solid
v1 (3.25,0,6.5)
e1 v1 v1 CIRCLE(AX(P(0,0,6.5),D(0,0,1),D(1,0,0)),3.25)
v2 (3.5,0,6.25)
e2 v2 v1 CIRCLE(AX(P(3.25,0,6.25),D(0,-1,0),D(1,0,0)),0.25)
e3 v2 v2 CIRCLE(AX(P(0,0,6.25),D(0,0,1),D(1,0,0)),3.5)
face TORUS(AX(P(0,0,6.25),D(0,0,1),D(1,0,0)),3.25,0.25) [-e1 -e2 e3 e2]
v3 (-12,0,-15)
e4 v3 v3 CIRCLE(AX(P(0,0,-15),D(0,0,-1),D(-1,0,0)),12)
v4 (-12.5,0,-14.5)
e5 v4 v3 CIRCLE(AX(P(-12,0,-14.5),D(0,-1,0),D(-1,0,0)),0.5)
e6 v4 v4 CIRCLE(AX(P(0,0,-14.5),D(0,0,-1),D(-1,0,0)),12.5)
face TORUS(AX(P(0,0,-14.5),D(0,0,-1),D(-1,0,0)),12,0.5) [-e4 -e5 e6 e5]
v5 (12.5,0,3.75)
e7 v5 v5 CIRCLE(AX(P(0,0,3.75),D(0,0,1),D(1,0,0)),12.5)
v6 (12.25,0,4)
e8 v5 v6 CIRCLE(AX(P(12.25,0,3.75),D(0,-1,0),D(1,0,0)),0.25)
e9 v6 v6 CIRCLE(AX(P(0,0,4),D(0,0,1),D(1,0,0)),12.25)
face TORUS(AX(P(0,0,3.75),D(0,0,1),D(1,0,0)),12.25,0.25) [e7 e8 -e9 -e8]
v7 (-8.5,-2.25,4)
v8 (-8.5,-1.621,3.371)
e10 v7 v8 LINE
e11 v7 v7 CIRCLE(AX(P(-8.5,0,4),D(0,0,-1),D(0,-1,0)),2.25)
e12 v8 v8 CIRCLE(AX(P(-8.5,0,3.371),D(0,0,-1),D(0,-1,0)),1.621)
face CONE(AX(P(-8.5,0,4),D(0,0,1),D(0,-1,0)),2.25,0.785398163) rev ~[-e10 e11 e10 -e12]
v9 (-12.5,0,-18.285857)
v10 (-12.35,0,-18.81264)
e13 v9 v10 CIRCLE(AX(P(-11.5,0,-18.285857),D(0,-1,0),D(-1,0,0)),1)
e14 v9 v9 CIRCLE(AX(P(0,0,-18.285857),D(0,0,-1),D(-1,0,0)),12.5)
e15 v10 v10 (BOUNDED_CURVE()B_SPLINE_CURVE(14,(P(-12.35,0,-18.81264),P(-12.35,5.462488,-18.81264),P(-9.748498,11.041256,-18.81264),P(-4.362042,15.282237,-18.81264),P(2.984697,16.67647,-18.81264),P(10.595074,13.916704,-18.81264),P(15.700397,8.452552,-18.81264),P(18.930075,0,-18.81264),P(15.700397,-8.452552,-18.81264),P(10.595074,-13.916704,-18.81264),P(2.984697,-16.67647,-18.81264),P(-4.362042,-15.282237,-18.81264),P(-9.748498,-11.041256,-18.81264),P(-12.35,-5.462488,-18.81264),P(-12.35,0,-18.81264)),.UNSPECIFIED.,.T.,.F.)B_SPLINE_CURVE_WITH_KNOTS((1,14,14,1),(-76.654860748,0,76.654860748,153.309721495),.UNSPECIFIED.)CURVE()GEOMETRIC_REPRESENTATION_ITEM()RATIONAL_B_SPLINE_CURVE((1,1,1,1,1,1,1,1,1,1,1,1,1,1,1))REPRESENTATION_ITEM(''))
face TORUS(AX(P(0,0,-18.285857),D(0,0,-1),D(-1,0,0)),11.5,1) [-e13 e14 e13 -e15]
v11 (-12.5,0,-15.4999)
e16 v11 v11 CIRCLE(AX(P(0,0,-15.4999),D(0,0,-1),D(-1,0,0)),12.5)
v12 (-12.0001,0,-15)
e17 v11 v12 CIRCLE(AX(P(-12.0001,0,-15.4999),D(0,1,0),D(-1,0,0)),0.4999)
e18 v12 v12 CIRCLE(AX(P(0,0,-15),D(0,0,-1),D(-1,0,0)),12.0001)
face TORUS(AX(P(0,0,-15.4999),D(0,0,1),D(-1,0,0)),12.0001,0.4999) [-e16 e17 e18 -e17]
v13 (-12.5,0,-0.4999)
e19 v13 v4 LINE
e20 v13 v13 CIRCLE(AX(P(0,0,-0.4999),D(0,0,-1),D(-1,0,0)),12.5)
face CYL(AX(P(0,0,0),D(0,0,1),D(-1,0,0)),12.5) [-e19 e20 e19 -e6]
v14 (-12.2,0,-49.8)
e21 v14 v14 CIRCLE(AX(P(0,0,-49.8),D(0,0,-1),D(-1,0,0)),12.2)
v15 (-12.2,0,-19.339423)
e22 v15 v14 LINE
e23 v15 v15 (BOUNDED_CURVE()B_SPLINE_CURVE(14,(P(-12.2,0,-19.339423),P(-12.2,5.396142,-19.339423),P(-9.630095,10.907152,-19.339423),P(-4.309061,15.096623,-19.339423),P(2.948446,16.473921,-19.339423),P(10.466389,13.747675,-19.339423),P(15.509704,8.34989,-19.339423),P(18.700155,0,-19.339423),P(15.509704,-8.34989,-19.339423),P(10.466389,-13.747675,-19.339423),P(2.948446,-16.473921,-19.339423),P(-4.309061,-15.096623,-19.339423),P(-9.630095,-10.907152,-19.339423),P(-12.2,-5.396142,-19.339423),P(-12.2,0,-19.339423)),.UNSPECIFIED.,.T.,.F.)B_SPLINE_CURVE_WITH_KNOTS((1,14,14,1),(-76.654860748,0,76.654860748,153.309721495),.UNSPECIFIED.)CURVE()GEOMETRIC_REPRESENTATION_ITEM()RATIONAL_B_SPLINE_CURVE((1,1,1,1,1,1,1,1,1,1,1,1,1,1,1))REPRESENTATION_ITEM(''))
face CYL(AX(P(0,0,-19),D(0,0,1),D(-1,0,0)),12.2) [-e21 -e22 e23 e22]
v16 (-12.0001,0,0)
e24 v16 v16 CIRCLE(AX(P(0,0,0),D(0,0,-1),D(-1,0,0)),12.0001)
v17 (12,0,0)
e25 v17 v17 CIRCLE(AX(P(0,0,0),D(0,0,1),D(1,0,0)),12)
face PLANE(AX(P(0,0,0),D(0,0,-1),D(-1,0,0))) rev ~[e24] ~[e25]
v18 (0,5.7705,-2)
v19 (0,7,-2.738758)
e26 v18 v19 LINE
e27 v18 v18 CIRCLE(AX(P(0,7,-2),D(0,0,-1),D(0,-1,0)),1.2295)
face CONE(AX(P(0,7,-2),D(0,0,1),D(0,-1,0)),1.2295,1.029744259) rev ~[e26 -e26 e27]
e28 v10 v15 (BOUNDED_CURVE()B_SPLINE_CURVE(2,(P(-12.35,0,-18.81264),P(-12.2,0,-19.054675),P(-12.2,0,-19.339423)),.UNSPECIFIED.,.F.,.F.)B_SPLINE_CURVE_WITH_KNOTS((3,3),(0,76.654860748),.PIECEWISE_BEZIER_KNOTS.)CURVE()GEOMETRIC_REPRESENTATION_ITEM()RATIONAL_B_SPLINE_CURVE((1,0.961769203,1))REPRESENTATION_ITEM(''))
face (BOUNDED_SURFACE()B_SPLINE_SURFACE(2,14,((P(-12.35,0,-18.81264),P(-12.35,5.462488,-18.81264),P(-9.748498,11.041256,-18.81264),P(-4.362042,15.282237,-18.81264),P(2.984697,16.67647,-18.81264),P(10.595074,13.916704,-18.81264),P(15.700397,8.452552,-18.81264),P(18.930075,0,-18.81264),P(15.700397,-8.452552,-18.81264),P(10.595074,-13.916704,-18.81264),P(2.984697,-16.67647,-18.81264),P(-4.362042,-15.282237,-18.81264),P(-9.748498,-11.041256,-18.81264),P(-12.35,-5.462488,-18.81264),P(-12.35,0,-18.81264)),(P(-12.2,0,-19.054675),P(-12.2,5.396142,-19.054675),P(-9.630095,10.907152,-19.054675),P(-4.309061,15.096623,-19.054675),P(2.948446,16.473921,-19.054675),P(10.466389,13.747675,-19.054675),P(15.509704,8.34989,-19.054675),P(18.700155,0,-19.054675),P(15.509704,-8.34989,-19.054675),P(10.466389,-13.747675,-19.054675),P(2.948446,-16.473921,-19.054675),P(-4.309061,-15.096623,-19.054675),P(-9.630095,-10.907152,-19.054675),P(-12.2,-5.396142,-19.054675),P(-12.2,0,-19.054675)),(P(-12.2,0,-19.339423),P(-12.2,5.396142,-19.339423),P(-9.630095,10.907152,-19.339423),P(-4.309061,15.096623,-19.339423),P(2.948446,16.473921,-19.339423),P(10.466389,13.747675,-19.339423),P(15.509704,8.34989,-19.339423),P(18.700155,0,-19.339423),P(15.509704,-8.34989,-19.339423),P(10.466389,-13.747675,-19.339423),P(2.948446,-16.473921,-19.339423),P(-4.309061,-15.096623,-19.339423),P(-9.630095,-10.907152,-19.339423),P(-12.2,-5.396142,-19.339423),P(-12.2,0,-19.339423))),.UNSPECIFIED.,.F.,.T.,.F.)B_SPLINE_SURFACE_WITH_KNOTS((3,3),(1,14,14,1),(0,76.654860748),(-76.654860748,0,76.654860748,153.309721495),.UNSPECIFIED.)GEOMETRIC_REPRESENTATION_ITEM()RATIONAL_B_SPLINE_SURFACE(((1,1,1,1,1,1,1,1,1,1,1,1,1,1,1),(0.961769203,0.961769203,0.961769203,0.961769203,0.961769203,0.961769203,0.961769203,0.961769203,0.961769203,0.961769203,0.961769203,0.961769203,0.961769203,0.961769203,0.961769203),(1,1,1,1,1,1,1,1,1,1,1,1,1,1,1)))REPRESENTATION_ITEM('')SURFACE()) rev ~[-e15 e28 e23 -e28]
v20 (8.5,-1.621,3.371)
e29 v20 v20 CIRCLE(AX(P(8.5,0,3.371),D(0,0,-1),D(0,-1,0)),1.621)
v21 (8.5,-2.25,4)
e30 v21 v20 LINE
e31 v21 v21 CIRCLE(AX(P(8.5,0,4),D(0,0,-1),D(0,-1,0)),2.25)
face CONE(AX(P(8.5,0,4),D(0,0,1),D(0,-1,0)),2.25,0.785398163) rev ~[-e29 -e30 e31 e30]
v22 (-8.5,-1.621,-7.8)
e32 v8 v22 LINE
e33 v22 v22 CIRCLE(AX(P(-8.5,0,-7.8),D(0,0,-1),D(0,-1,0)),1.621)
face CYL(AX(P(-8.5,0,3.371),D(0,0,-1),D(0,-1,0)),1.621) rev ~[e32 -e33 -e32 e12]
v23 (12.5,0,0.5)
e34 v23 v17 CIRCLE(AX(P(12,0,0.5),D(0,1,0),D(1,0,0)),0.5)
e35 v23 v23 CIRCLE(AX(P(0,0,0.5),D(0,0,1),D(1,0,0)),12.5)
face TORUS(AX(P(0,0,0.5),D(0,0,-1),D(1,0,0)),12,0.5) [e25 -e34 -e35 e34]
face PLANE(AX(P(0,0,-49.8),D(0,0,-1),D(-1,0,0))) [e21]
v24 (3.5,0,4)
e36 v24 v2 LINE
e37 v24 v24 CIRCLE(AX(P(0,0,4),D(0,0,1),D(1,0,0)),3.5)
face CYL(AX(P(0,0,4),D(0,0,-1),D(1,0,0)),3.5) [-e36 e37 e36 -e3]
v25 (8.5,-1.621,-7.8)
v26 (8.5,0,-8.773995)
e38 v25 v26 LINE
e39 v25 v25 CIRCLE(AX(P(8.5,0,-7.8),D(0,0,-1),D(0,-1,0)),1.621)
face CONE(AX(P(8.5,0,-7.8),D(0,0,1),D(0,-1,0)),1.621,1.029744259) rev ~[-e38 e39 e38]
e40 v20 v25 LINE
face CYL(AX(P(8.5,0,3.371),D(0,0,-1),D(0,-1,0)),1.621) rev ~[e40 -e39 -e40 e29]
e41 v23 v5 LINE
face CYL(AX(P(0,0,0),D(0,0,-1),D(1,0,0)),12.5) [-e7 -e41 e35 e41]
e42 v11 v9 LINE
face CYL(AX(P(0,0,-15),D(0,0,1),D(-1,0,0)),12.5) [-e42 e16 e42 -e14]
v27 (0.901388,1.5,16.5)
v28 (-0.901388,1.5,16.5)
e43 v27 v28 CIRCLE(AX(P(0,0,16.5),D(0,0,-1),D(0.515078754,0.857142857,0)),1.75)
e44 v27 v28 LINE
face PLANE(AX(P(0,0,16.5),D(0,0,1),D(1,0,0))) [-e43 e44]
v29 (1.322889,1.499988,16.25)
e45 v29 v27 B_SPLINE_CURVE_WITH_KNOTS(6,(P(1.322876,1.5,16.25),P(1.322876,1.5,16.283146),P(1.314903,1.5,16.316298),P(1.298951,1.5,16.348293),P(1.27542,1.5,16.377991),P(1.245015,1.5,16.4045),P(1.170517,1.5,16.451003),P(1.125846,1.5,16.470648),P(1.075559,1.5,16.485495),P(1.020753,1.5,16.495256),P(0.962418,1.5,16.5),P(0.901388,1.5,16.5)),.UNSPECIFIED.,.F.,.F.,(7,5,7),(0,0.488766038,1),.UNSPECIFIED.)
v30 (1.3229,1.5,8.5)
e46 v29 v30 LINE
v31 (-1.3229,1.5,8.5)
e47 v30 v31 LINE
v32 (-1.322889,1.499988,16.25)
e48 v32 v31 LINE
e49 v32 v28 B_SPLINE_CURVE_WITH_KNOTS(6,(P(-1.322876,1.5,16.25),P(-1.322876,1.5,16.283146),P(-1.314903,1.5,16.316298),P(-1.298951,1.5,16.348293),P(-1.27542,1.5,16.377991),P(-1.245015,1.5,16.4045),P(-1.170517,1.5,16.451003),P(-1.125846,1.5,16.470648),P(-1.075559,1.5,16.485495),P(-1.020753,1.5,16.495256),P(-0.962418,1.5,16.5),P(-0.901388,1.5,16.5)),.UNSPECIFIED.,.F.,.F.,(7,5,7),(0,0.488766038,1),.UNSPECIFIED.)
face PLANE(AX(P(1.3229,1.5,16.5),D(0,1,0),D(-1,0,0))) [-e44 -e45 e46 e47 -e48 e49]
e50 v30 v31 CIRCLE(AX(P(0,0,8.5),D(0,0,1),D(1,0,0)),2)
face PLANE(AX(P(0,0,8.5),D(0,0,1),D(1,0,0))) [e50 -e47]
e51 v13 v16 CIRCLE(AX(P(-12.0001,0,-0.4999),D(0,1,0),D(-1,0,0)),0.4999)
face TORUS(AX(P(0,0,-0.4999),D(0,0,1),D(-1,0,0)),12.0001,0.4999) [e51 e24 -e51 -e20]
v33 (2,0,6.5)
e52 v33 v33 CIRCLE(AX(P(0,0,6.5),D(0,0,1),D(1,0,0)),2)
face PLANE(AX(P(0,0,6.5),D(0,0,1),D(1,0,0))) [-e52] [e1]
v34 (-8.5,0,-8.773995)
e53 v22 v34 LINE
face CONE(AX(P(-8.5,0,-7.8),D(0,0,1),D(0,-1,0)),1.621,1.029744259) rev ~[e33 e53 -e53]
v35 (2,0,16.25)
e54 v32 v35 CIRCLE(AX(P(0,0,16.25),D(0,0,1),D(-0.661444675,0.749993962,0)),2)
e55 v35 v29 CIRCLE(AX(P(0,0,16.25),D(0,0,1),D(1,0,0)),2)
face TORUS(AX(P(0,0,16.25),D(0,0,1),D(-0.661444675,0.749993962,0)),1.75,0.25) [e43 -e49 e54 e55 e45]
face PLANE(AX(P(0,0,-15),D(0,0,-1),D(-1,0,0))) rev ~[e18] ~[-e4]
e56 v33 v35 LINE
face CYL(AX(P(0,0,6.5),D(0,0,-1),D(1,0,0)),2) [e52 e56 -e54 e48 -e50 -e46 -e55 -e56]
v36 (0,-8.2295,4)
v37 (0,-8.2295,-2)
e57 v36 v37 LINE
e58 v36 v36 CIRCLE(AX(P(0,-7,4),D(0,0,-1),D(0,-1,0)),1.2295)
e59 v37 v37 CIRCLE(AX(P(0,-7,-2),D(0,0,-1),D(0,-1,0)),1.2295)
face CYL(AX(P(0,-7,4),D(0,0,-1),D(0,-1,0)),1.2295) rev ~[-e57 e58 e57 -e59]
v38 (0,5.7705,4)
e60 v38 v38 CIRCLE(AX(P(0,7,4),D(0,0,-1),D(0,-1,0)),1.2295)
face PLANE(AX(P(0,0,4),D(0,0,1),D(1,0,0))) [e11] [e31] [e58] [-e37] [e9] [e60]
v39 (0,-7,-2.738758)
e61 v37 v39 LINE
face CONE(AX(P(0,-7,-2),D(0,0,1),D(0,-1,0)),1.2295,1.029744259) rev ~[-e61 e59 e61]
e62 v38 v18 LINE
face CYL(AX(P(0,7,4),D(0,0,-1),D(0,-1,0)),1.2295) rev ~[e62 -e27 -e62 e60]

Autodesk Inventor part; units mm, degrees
ref_plane "YZ Plane" through (0, 0, 0) normal (1, 0, 0) x (0, 1, 0)
ref_plane "XZ Plane" through (0, 0, 0) normal (0, 1, 0) x (-1, 0, 0)
ref_plane "XY Plane" through (0, 0, 0) normal (0, 0, 1) x (1, 0, 0)
sketch "Szkic1" plane through (0, 0, 0) normal (0, 0, 1) x (1, 0, 0)
  circle A0 centre (0, 0) radius 12.5
  dimension "d0" = 25
extrude "Wyciągnięcie proste1" add sketch "Szkic1" along normal blind 4
sketch "Szkic2" plane through (0, 0, 0) normal (0, 0, -1) x (-1, 0, 0)
  circle A0 centre (0, 0) radius 12.5 projected
fillet "Zaokrąglenie1" radius 0.5 1 edges at (-12.5, 0, 0)
extrude "Wyciągnięcie proste2" add sketch "Szkic2" along normal blind 15
fillet "Zaokrąglenie2" radius 0.5 1 edges at (12.5, 0, 0)
fillet "Zaokrąglenie3" radius 0.5 1 edges at (12.5, 0, -15)
sketch "Szkic4" plane through (0, 0, -15) normal (0, 0, -1) x (-1, 0, 0)
  circle A0 centre (0, 0) radius 12.5 projected
extrude "Wyciągnięcie proste3" add sketch "Szkic4" along normal blind 4
fillet "Zaokrąglenie4" radius 0.5 1 edges at (12.5, 0, -15)
sketch "Szkic5" plane through (0, 0, 4) normal (0, 0, 1) x (1, 0, 0)
  circle A0 centre (0, 0) radius 3.5
  dimension "d11" = 7
extrude "Wyciągnięcie proste4" add sketch "Szkic5" along normal blind 2.5
sketch "Szkic6" plane through (0, 0, 6.5) normal (0, 0, 1) x (1, 0, 0)
  circle A0 centre (0, 0) radius 2
  dimension "d14" = 4
extrude "Wyciągnięcie proste5" add sketch "Szkic6" along normal blind 10
sketch "Szkic7" plane through (0, 0, 16.5) normal (0, 0, 1) x (1, 0, 0)
  circle A0 centre (0, 0) radius 2 projected
  circle A1 centre (0, 0) radius 2 projected
  line L0 (1.3229, 1.5) -> (1.3229, 1.5)
  line L1 (-3.3787, -2) -> (2.8088, -2) construction
  circle A2 centre (0, 0) radius 2
  line L2 (1.3229, 1.5) -> (-1.3229, 1.5)
  dimension "d17" = 3.5
extrude "Wyciągnięcie proste6" cut sketch "Szkic7" against normal blind 8 contours L2 A0 picked at (-0.3089, 1.5908)
fillet "Zaokrąglenie5" radius 0.25 1 edges at (-12.5, 0, 4)
fillet "Zaokrąglenie6" radius 0.25 3 edges at (-3.5, 0, 6.5) (-0.8229, -1.8229, 16.5) (1.8229, 0.8229, 16.5)
sketch "Szkic8" plane through (0, 0, -19) normal (0, 0, -1) x (-1, 0, 0)
  circle A0 centre (0, 0) radius 12.2
  dimension "d22" = 24.4
extrude "Wyciągnięcie proste7" add sketch "Szkic8" along normal blind 30.8
sketch "Szkic9" plane through (0, 0, 4) normal (0, 0, 1) x (1, 0, 0)
  circle A0 centre (0, 0) radius 3.5 projected
  circle A1 centre (0, 0) radius 12.25 projected
  line L0 (0, 12.25) -> (0, -12.25) construction
  line L1 (-10.7735, 0) -> (10.2994, 0) construction
  point P0 (0, 7)
  point P1 (0, -7)
  dimension "d25" = 14
hole "Otwór1" at (0, 7, 4) at (0, -7, 4) direction (0, 0, -1) diameter 2.459 depth 6 tip angle 118 thread size "M3x0.5" class "6H" standard "ISO Metric profile"
sketch "Szkic10" plane through (0, 0, 4) normal (0, 0, 1) x (1, 0, 0)
  circle A0 centre (0, 0) radius 12.25 projected
  circle A1 centre (0, 7) radius 1.2295 construction
  circle A2 centre (0, -7) radius 1.2295 construction
  line L0 (0, 7) -> (0, -7) construction
  line L1 (-8.5, 0) -> (7.3075, 0) construction
  point P0 (8.5, 0)
  point P1 (0, 0)
  dimension "d33" = 17
hole "Otwór2" at (-8.5, 0, 4) at (8.5, 0, 4) direction (0, 0, -1) diameter 3.242 depth 11.8 tip angle 118 countersink diameter 4.5 countersink angle 90 thread size "M4x0.7" class "6H" standard "ANSI Metric M Profile"
fillet "Zaokrąglenie7" radius 1 1 edges at (12.5, 0, -19)
fillet "Zaokrąglenie8" radius 1 1 edges at (12.2, 0, -19)
properties part number "motor_dc"
